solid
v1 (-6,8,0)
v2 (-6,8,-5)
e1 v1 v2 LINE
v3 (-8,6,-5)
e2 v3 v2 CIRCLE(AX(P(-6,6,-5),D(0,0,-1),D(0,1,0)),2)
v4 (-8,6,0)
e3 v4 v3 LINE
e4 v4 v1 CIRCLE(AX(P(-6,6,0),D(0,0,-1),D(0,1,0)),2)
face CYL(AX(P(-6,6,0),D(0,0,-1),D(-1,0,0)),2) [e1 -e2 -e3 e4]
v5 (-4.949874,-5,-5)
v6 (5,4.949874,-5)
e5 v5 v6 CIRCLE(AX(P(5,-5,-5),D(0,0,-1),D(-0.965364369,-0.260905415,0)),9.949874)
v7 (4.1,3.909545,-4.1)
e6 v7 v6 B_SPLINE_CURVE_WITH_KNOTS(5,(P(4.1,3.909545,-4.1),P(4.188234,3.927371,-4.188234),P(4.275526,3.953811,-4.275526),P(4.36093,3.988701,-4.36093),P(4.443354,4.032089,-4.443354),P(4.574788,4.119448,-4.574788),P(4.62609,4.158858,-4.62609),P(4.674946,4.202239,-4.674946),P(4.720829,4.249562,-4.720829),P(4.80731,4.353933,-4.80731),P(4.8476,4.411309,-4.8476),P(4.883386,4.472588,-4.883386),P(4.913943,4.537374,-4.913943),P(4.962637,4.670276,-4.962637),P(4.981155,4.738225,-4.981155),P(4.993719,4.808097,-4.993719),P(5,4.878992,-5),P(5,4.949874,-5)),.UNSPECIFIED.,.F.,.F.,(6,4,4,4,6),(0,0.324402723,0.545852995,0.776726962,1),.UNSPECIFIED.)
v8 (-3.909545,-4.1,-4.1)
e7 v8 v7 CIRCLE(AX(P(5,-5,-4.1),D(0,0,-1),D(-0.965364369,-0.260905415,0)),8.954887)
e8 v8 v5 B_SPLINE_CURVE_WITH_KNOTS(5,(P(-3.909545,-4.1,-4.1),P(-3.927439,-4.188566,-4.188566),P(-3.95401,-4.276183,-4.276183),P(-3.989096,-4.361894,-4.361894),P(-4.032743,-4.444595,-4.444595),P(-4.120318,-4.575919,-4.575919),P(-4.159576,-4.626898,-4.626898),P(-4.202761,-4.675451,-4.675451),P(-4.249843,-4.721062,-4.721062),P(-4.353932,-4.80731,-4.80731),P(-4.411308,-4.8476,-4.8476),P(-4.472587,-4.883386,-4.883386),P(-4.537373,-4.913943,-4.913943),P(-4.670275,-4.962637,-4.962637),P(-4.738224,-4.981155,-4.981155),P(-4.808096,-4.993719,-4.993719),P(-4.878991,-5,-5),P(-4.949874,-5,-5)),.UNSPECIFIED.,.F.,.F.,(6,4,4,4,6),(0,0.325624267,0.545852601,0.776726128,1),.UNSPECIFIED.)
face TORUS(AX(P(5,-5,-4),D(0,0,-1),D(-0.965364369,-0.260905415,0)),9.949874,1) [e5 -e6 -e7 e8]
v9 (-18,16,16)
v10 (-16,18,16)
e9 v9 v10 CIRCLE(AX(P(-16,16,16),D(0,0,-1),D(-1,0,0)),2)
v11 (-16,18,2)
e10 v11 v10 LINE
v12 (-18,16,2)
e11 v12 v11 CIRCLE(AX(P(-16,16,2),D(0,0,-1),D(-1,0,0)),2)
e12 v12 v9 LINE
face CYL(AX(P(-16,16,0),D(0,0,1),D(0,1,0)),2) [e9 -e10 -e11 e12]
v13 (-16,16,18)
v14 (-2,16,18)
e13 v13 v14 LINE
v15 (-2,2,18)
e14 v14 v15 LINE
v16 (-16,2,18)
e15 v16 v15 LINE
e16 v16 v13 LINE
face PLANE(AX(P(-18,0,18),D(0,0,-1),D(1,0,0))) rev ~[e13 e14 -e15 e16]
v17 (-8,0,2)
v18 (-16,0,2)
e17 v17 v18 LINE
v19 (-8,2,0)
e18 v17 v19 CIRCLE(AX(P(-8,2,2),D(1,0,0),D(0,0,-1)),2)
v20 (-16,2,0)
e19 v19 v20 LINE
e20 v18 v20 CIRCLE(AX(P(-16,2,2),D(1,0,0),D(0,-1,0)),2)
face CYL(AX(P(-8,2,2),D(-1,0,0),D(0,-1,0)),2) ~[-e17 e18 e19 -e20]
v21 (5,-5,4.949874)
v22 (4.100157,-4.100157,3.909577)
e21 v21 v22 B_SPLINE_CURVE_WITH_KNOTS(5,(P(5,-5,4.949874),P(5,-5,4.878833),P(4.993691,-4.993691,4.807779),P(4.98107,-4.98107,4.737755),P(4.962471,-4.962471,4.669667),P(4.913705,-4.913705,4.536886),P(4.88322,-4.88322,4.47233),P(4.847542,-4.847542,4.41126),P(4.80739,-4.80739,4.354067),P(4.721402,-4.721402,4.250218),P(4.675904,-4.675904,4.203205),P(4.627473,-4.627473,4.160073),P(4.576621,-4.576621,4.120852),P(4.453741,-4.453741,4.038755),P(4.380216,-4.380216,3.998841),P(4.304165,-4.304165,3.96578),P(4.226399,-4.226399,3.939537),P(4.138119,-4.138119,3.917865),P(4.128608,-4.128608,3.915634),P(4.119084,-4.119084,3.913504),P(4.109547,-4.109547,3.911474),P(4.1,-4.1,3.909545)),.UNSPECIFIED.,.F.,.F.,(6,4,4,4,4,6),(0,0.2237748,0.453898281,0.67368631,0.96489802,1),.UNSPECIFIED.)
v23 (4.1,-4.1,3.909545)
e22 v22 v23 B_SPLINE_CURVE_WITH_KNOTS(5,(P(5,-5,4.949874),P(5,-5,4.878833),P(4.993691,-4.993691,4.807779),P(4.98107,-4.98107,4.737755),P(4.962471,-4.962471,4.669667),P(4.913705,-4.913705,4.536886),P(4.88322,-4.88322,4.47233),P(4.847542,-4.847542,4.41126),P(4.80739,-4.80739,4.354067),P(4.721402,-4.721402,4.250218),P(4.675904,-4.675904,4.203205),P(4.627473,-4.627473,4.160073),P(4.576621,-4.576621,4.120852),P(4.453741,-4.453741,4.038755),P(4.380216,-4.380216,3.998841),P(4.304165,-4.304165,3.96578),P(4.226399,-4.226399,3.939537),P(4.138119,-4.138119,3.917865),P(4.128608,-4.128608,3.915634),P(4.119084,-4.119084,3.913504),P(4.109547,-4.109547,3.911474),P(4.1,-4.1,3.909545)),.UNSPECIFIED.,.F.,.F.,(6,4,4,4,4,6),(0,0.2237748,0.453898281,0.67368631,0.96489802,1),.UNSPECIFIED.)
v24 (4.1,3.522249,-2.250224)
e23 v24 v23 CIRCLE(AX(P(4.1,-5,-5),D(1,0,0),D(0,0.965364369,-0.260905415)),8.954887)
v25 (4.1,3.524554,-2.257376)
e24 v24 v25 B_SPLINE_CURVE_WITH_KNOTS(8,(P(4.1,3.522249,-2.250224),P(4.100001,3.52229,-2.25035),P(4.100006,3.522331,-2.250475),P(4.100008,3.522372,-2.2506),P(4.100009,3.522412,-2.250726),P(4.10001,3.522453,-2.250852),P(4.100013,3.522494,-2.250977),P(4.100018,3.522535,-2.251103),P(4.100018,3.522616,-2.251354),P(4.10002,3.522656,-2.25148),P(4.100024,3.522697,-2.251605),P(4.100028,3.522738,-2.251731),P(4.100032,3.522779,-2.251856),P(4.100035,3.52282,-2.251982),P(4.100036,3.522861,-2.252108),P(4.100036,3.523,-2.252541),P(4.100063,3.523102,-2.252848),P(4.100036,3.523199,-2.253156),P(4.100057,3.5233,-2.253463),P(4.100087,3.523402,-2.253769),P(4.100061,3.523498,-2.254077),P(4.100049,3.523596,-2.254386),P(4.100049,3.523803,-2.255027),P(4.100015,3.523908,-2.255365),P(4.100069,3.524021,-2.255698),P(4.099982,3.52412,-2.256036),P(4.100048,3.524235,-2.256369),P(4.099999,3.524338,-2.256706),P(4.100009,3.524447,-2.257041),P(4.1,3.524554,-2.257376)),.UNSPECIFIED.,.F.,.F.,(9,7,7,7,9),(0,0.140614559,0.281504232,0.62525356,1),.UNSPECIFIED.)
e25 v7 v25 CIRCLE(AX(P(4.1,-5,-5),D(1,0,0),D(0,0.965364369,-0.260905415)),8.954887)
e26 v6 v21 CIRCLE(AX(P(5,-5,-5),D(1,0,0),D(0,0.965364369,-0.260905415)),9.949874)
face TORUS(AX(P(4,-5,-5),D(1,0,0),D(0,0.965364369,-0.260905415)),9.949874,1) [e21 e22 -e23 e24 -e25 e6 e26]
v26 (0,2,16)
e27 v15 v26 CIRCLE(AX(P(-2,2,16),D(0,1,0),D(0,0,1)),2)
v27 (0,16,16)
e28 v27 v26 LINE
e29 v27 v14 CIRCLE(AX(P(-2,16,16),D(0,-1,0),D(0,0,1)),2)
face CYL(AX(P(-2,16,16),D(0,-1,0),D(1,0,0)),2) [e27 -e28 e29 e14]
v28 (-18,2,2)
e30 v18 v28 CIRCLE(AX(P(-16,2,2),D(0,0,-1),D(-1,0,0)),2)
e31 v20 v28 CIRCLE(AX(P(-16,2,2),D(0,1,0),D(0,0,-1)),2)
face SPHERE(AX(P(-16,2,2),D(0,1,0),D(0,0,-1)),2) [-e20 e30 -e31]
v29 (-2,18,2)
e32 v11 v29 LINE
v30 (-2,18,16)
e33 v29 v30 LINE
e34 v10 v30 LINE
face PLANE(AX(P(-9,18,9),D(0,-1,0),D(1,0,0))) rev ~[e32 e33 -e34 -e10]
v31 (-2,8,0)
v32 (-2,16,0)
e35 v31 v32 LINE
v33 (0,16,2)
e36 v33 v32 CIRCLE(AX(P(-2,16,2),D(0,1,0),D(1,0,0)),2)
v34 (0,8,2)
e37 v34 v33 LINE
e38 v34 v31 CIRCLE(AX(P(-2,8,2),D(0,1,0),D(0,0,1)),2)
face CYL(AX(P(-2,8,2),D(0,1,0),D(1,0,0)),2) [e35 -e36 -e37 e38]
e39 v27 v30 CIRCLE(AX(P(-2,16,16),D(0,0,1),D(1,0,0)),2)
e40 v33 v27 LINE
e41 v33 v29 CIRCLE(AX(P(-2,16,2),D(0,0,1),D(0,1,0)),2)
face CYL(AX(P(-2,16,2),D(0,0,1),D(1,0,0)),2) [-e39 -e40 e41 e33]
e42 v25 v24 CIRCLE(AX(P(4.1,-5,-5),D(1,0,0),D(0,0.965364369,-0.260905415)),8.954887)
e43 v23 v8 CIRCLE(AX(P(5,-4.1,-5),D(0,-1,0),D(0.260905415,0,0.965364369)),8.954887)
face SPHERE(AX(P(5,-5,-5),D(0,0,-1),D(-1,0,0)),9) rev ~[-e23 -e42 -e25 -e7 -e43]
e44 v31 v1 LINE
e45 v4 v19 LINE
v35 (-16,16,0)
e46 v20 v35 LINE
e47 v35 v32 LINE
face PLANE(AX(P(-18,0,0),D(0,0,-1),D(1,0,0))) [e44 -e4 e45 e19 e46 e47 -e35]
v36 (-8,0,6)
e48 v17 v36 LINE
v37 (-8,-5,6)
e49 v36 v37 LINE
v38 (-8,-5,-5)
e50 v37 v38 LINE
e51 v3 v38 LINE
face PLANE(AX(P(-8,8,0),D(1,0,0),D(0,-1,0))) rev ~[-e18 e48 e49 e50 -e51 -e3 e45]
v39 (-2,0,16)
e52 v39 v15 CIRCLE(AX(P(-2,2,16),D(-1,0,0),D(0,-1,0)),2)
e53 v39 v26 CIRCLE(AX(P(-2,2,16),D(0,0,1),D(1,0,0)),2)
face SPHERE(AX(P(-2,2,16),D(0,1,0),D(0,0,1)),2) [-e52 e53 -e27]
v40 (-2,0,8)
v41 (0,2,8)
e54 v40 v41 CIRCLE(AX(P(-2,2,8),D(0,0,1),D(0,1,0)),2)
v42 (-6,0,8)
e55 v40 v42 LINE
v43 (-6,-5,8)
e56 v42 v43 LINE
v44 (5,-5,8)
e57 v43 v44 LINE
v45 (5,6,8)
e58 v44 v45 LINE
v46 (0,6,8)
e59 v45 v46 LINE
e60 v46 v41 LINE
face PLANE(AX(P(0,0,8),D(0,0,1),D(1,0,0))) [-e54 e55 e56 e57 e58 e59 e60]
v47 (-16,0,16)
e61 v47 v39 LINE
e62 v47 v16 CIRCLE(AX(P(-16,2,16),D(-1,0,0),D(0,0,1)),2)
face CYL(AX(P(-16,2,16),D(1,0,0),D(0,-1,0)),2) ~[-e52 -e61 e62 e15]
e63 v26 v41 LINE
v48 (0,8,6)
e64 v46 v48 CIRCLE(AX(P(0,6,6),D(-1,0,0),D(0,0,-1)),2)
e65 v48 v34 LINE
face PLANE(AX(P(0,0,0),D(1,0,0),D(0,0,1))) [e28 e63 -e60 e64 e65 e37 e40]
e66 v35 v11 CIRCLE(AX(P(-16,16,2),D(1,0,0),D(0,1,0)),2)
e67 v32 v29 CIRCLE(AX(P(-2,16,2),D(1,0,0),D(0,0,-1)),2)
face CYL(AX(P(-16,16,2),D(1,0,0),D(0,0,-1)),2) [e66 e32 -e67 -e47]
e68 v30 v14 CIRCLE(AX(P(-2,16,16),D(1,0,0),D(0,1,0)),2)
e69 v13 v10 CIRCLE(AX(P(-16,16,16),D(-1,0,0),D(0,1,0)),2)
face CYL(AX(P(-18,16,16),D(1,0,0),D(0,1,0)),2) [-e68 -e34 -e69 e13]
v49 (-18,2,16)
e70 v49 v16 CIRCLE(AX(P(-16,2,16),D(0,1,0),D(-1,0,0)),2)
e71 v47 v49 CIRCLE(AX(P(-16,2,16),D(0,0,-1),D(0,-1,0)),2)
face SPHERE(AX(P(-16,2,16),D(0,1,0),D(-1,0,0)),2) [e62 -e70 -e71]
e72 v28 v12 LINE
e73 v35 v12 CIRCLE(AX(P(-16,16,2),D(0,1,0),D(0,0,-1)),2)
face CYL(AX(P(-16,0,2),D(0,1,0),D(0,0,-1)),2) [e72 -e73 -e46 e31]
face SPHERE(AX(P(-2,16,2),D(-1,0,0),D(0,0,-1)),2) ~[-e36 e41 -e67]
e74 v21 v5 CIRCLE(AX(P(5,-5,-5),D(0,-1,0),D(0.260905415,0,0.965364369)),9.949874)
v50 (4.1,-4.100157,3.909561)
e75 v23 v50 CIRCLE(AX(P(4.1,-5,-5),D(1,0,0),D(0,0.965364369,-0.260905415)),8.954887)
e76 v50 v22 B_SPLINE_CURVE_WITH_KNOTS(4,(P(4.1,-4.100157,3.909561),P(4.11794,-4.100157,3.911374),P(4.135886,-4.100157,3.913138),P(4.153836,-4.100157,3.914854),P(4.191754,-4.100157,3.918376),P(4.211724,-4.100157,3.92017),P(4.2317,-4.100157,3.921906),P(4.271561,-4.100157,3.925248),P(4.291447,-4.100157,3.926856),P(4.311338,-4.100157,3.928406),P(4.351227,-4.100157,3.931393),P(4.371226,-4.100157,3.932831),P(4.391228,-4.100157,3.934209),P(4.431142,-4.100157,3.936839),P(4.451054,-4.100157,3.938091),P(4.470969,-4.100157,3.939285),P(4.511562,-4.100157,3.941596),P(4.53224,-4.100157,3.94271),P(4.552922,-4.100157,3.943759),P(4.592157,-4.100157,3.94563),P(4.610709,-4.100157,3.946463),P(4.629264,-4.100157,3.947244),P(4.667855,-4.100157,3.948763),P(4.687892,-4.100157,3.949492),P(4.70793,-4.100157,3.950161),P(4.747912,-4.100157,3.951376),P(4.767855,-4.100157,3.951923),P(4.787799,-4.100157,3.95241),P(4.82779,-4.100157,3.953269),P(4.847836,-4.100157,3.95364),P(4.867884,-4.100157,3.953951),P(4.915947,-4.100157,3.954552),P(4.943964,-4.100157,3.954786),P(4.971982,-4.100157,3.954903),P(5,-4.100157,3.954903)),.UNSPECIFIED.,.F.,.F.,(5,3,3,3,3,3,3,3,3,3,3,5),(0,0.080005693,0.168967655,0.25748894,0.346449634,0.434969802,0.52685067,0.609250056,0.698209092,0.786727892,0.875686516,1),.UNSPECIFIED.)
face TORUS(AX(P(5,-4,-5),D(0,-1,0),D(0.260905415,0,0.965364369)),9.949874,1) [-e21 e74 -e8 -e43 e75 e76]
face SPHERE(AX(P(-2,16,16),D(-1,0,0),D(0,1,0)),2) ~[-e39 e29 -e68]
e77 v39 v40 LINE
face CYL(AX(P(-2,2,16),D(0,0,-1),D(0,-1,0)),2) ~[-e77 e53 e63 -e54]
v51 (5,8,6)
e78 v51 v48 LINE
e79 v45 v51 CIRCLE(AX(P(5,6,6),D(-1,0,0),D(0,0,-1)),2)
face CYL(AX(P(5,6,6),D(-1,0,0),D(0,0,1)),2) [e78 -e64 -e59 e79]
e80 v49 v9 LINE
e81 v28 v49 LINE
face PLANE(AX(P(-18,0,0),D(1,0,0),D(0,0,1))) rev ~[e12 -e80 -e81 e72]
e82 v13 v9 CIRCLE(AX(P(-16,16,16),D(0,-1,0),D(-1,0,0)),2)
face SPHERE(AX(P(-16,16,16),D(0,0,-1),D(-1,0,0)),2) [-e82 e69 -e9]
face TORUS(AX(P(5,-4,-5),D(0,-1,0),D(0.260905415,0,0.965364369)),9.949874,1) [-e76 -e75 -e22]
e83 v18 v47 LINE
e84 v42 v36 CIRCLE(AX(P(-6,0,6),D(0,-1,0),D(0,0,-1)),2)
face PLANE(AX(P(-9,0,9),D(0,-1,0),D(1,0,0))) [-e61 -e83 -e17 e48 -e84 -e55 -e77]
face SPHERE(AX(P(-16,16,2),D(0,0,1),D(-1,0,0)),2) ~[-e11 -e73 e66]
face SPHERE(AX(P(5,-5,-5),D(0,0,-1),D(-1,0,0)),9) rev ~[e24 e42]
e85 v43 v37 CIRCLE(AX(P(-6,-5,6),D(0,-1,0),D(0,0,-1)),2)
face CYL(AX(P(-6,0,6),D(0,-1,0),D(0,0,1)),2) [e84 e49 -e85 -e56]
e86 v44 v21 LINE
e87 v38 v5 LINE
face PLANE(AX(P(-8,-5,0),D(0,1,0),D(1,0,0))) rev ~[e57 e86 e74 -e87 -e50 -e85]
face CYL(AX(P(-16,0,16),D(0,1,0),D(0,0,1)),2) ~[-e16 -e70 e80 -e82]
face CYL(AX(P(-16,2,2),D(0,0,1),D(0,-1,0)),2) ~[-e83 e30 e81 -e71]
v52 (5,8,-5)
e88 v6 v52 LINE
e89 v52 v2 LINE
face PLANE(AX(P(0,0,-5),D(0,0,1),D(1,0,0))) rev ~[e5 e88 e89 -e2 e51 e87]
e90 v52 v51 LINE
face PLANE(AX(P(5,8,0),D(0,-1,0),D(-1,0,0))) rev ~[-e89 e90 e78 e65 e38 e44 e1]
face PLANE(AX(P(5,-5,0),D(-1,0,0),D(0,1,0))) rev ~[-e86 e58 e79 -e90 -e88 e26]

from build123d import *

# Parameters (mm, degrees)
F0_W         = 18
F0_H         = 18
F1_DEPTH     = 18
F2_W         = 10
F2_H         = 10
F2_W_2       = 3
F2_H_2       = 3
F3_DEPTH     = 5
F4_DEPTH     = 8
F5_R         = 2
F6_F1_R      = 2
F6_F2_R      = 2
F6_F3_R      = 2
F7_R         = 2
F11_T2_ANGLE = 120.2475861172
F11_T4_ANGLE = 120.2475861172
F11_T6_ANGLE = 120.2475861172


# Not quite as in the source:
# - a fillet or chamfer that OpenCascade refuses, or shapes differently, is made with other operations: its cross-section is extruded or revolved along the edge and cut away or added
# - two fillets or chamfers of one size are made in one step


with BuildPart() as f1:
    # F0 (on Front) → F1 (new body)
    with BuildSketch(Plane.XZ):
        with Locations((-9, 9)):
            Rectangle(F0_W, F0_H)
    extrude(amount=-F1_DEPTH)

    # F2 (on Top) → F3 (join)
    with BuildSketch(Plane.XY):
        Rectangle(F2_W, F2_H)
        with Locations((-6.5, 0)):
            Rectangle(F2_W_2, F2_H)
        with Locations((0, 6.5)):
            Rectangle(F2_W, F2_H_2)
        with Locations((-6.5, 6.5)):
            Rectangle(F2_W_2, F2_H_2)
    extrude(amount=-F3_DEPTH)

    # F2 (on Top) → F4 (join)
    with BuildSketch(Plane.XY):
        Rectangle(F2_W, F2_H)
        with Locations((-6.5, 0)):
            Rectangle(F2_W_2, F2_H)
        with Locations((0, 6.5)):
            Rectangle(F2_W, F2_H_2)
        with Locations((-6.5, 6.5)):
            Rectangle(F2_W_2, F2_H_2)
    extrude(amount=F4_DEPTH)

    # F5
    f5_edges = [f1.edges().sort_by_distance(p)[0] for p in [
        (-18, 18, 9),
        (-18, 9, 18),
        (-9, 18, 18),
    ]]
    fillet(f5_edges, radius=F5_R)

    # F6: fillet of radius 2 on 3 edges, made by hand

    # F6_f1
    f6_f1_edges = [f1.edges().sort_by_distance(p)[0] for p in [
        (-8, 18, 0),
        (-17.4142135624, 17.4142135624, 0),
        (-18, 8, 0),
    ]]
    fillet(f6_f1_edges, radius=F6_F1_R)

    # F6_f2
    f6_f2_edges = [f1.edges().sort_by_distance(p)[0] for p in [
        (0, 18, 9),
        (0, 8, 18),
        (0, 17.4142135624, 17.4142135624),
    ]]
    fillet(f6_f2_edges, radius=F6_F2_R)

    # F6_f3
    f6_f3_edges = [f1.edges().sort_by_distance(p)[0] for p in [
        (-18, 0, 9),
        (-17.4142135624, 0, 17.4142135624),
        (-9, 0, 18),
    ]]
    fillet(f6_f3_edges, radius=F6_F3_R)

    # F7
    f7_edges = [f1.edges().sort_by_distance(p)[0] for p in [
        (-8, -2.5, 8),
        (-8, 8, -2.5),
        (2.5, 8, 8),
    ]]
    fillet(f7_edges, radius=F7_R)

    # F9 (on face) → F10 (revolve, cut)
    with BuildSketch(Plane.XZ.offset(5)):
        with BuildLine():
            Line((5, -5), (5, 4))
            ThreePointArc((5, 4), (-1.3639610307, 1.3639610307), (-4, -5))
            Line((-4, -5), (5, -5))
        make_face()
    revolve(axis=Axis((5, -5, -0.5), (0, 0, -1)), mode=Mode.SUBTRACT)

    # F11: fillet of radius 1 on 3 edges, made by hand

    # F11_s1 → F11_t2 (revolve, cut)
    with BuildSketch(Plane(origin=(5.9189857789, 0, -1.5997021362), x_dir=(0, 1, 0), z_dir=(0.9653643687, 0, -0.2609054153))):
        with BuildLine():
            ThreePointArc((-5, 6.4275796043), (-4.7416198487, 5.756759211), (-4.1, 5.4325921672))
            ThreePointArc((-4.1, 5.4325921672), (-4.5494350245, 5.4664198912), (-5, 5.4777052332))
            Line((-5, 5.4777052332), (-5, 6.4275796043))
        make_face()
    revolve(axis=Axis((5, -5, -5), (0, -1, 0)), revolution_arc=F11_T2_ANGLE, mode=Mode.SUBTRACT)

    # F11_s3 → F11_t4 (revolve, cut)
    with BuildSketch(Plane(origin=(1.5997021362, -5.9189857789, 0), x_dir=(0, 0, 1), z_dir=(0.2609054153, -0.9653643687, 0))):
        with BuildLine():
            ThreePointArc((-5, 6.4275796043), (-4.7416198487, 5.756759211), (-4.1, 5.4325921672))
            ThreePointArc((-4.1, 5.4325921672), (-4.5494350245, 5.4664198912), (-5, 5.4777052332))
            Line((-5, 5.4777052332), (-5, 6.4275796043))
        make_face()
    revolve(axis=Axis((5, -5, -5), (0, 0, -1)), revolution_arc=F11_T4_ANGLE, mode=Mode.SUBTRACT)

    # F11_s5 → F11_t6 (revolve, cut)
    with BuildSketch(Plane(origin=(0, -1.5997021362, -5.9189857789), x_dir=(1, 0, 0), z_dir=(0, -0.2609054153, -0.9653643687))):
        with BuildLine():
            ThreePointArc((5, -6.4275796043), (4.7416198487, -5.756759211), (4.1, -5.4325921672))
            ThreePointArc((4.1, -5.4325921672), (4.5494350245, -5.4664198912), (5, -5.4777052332))
            Line((5, -5.4777052332), (5, -6.4275796043))
        make_face()
    revolve(axis=Axis((5, -5, -5), (1, 0, 0)), revolution_arc=F11_T6_ANGLE, mode=Mode.SUBTRACT)


solid = f1.part
